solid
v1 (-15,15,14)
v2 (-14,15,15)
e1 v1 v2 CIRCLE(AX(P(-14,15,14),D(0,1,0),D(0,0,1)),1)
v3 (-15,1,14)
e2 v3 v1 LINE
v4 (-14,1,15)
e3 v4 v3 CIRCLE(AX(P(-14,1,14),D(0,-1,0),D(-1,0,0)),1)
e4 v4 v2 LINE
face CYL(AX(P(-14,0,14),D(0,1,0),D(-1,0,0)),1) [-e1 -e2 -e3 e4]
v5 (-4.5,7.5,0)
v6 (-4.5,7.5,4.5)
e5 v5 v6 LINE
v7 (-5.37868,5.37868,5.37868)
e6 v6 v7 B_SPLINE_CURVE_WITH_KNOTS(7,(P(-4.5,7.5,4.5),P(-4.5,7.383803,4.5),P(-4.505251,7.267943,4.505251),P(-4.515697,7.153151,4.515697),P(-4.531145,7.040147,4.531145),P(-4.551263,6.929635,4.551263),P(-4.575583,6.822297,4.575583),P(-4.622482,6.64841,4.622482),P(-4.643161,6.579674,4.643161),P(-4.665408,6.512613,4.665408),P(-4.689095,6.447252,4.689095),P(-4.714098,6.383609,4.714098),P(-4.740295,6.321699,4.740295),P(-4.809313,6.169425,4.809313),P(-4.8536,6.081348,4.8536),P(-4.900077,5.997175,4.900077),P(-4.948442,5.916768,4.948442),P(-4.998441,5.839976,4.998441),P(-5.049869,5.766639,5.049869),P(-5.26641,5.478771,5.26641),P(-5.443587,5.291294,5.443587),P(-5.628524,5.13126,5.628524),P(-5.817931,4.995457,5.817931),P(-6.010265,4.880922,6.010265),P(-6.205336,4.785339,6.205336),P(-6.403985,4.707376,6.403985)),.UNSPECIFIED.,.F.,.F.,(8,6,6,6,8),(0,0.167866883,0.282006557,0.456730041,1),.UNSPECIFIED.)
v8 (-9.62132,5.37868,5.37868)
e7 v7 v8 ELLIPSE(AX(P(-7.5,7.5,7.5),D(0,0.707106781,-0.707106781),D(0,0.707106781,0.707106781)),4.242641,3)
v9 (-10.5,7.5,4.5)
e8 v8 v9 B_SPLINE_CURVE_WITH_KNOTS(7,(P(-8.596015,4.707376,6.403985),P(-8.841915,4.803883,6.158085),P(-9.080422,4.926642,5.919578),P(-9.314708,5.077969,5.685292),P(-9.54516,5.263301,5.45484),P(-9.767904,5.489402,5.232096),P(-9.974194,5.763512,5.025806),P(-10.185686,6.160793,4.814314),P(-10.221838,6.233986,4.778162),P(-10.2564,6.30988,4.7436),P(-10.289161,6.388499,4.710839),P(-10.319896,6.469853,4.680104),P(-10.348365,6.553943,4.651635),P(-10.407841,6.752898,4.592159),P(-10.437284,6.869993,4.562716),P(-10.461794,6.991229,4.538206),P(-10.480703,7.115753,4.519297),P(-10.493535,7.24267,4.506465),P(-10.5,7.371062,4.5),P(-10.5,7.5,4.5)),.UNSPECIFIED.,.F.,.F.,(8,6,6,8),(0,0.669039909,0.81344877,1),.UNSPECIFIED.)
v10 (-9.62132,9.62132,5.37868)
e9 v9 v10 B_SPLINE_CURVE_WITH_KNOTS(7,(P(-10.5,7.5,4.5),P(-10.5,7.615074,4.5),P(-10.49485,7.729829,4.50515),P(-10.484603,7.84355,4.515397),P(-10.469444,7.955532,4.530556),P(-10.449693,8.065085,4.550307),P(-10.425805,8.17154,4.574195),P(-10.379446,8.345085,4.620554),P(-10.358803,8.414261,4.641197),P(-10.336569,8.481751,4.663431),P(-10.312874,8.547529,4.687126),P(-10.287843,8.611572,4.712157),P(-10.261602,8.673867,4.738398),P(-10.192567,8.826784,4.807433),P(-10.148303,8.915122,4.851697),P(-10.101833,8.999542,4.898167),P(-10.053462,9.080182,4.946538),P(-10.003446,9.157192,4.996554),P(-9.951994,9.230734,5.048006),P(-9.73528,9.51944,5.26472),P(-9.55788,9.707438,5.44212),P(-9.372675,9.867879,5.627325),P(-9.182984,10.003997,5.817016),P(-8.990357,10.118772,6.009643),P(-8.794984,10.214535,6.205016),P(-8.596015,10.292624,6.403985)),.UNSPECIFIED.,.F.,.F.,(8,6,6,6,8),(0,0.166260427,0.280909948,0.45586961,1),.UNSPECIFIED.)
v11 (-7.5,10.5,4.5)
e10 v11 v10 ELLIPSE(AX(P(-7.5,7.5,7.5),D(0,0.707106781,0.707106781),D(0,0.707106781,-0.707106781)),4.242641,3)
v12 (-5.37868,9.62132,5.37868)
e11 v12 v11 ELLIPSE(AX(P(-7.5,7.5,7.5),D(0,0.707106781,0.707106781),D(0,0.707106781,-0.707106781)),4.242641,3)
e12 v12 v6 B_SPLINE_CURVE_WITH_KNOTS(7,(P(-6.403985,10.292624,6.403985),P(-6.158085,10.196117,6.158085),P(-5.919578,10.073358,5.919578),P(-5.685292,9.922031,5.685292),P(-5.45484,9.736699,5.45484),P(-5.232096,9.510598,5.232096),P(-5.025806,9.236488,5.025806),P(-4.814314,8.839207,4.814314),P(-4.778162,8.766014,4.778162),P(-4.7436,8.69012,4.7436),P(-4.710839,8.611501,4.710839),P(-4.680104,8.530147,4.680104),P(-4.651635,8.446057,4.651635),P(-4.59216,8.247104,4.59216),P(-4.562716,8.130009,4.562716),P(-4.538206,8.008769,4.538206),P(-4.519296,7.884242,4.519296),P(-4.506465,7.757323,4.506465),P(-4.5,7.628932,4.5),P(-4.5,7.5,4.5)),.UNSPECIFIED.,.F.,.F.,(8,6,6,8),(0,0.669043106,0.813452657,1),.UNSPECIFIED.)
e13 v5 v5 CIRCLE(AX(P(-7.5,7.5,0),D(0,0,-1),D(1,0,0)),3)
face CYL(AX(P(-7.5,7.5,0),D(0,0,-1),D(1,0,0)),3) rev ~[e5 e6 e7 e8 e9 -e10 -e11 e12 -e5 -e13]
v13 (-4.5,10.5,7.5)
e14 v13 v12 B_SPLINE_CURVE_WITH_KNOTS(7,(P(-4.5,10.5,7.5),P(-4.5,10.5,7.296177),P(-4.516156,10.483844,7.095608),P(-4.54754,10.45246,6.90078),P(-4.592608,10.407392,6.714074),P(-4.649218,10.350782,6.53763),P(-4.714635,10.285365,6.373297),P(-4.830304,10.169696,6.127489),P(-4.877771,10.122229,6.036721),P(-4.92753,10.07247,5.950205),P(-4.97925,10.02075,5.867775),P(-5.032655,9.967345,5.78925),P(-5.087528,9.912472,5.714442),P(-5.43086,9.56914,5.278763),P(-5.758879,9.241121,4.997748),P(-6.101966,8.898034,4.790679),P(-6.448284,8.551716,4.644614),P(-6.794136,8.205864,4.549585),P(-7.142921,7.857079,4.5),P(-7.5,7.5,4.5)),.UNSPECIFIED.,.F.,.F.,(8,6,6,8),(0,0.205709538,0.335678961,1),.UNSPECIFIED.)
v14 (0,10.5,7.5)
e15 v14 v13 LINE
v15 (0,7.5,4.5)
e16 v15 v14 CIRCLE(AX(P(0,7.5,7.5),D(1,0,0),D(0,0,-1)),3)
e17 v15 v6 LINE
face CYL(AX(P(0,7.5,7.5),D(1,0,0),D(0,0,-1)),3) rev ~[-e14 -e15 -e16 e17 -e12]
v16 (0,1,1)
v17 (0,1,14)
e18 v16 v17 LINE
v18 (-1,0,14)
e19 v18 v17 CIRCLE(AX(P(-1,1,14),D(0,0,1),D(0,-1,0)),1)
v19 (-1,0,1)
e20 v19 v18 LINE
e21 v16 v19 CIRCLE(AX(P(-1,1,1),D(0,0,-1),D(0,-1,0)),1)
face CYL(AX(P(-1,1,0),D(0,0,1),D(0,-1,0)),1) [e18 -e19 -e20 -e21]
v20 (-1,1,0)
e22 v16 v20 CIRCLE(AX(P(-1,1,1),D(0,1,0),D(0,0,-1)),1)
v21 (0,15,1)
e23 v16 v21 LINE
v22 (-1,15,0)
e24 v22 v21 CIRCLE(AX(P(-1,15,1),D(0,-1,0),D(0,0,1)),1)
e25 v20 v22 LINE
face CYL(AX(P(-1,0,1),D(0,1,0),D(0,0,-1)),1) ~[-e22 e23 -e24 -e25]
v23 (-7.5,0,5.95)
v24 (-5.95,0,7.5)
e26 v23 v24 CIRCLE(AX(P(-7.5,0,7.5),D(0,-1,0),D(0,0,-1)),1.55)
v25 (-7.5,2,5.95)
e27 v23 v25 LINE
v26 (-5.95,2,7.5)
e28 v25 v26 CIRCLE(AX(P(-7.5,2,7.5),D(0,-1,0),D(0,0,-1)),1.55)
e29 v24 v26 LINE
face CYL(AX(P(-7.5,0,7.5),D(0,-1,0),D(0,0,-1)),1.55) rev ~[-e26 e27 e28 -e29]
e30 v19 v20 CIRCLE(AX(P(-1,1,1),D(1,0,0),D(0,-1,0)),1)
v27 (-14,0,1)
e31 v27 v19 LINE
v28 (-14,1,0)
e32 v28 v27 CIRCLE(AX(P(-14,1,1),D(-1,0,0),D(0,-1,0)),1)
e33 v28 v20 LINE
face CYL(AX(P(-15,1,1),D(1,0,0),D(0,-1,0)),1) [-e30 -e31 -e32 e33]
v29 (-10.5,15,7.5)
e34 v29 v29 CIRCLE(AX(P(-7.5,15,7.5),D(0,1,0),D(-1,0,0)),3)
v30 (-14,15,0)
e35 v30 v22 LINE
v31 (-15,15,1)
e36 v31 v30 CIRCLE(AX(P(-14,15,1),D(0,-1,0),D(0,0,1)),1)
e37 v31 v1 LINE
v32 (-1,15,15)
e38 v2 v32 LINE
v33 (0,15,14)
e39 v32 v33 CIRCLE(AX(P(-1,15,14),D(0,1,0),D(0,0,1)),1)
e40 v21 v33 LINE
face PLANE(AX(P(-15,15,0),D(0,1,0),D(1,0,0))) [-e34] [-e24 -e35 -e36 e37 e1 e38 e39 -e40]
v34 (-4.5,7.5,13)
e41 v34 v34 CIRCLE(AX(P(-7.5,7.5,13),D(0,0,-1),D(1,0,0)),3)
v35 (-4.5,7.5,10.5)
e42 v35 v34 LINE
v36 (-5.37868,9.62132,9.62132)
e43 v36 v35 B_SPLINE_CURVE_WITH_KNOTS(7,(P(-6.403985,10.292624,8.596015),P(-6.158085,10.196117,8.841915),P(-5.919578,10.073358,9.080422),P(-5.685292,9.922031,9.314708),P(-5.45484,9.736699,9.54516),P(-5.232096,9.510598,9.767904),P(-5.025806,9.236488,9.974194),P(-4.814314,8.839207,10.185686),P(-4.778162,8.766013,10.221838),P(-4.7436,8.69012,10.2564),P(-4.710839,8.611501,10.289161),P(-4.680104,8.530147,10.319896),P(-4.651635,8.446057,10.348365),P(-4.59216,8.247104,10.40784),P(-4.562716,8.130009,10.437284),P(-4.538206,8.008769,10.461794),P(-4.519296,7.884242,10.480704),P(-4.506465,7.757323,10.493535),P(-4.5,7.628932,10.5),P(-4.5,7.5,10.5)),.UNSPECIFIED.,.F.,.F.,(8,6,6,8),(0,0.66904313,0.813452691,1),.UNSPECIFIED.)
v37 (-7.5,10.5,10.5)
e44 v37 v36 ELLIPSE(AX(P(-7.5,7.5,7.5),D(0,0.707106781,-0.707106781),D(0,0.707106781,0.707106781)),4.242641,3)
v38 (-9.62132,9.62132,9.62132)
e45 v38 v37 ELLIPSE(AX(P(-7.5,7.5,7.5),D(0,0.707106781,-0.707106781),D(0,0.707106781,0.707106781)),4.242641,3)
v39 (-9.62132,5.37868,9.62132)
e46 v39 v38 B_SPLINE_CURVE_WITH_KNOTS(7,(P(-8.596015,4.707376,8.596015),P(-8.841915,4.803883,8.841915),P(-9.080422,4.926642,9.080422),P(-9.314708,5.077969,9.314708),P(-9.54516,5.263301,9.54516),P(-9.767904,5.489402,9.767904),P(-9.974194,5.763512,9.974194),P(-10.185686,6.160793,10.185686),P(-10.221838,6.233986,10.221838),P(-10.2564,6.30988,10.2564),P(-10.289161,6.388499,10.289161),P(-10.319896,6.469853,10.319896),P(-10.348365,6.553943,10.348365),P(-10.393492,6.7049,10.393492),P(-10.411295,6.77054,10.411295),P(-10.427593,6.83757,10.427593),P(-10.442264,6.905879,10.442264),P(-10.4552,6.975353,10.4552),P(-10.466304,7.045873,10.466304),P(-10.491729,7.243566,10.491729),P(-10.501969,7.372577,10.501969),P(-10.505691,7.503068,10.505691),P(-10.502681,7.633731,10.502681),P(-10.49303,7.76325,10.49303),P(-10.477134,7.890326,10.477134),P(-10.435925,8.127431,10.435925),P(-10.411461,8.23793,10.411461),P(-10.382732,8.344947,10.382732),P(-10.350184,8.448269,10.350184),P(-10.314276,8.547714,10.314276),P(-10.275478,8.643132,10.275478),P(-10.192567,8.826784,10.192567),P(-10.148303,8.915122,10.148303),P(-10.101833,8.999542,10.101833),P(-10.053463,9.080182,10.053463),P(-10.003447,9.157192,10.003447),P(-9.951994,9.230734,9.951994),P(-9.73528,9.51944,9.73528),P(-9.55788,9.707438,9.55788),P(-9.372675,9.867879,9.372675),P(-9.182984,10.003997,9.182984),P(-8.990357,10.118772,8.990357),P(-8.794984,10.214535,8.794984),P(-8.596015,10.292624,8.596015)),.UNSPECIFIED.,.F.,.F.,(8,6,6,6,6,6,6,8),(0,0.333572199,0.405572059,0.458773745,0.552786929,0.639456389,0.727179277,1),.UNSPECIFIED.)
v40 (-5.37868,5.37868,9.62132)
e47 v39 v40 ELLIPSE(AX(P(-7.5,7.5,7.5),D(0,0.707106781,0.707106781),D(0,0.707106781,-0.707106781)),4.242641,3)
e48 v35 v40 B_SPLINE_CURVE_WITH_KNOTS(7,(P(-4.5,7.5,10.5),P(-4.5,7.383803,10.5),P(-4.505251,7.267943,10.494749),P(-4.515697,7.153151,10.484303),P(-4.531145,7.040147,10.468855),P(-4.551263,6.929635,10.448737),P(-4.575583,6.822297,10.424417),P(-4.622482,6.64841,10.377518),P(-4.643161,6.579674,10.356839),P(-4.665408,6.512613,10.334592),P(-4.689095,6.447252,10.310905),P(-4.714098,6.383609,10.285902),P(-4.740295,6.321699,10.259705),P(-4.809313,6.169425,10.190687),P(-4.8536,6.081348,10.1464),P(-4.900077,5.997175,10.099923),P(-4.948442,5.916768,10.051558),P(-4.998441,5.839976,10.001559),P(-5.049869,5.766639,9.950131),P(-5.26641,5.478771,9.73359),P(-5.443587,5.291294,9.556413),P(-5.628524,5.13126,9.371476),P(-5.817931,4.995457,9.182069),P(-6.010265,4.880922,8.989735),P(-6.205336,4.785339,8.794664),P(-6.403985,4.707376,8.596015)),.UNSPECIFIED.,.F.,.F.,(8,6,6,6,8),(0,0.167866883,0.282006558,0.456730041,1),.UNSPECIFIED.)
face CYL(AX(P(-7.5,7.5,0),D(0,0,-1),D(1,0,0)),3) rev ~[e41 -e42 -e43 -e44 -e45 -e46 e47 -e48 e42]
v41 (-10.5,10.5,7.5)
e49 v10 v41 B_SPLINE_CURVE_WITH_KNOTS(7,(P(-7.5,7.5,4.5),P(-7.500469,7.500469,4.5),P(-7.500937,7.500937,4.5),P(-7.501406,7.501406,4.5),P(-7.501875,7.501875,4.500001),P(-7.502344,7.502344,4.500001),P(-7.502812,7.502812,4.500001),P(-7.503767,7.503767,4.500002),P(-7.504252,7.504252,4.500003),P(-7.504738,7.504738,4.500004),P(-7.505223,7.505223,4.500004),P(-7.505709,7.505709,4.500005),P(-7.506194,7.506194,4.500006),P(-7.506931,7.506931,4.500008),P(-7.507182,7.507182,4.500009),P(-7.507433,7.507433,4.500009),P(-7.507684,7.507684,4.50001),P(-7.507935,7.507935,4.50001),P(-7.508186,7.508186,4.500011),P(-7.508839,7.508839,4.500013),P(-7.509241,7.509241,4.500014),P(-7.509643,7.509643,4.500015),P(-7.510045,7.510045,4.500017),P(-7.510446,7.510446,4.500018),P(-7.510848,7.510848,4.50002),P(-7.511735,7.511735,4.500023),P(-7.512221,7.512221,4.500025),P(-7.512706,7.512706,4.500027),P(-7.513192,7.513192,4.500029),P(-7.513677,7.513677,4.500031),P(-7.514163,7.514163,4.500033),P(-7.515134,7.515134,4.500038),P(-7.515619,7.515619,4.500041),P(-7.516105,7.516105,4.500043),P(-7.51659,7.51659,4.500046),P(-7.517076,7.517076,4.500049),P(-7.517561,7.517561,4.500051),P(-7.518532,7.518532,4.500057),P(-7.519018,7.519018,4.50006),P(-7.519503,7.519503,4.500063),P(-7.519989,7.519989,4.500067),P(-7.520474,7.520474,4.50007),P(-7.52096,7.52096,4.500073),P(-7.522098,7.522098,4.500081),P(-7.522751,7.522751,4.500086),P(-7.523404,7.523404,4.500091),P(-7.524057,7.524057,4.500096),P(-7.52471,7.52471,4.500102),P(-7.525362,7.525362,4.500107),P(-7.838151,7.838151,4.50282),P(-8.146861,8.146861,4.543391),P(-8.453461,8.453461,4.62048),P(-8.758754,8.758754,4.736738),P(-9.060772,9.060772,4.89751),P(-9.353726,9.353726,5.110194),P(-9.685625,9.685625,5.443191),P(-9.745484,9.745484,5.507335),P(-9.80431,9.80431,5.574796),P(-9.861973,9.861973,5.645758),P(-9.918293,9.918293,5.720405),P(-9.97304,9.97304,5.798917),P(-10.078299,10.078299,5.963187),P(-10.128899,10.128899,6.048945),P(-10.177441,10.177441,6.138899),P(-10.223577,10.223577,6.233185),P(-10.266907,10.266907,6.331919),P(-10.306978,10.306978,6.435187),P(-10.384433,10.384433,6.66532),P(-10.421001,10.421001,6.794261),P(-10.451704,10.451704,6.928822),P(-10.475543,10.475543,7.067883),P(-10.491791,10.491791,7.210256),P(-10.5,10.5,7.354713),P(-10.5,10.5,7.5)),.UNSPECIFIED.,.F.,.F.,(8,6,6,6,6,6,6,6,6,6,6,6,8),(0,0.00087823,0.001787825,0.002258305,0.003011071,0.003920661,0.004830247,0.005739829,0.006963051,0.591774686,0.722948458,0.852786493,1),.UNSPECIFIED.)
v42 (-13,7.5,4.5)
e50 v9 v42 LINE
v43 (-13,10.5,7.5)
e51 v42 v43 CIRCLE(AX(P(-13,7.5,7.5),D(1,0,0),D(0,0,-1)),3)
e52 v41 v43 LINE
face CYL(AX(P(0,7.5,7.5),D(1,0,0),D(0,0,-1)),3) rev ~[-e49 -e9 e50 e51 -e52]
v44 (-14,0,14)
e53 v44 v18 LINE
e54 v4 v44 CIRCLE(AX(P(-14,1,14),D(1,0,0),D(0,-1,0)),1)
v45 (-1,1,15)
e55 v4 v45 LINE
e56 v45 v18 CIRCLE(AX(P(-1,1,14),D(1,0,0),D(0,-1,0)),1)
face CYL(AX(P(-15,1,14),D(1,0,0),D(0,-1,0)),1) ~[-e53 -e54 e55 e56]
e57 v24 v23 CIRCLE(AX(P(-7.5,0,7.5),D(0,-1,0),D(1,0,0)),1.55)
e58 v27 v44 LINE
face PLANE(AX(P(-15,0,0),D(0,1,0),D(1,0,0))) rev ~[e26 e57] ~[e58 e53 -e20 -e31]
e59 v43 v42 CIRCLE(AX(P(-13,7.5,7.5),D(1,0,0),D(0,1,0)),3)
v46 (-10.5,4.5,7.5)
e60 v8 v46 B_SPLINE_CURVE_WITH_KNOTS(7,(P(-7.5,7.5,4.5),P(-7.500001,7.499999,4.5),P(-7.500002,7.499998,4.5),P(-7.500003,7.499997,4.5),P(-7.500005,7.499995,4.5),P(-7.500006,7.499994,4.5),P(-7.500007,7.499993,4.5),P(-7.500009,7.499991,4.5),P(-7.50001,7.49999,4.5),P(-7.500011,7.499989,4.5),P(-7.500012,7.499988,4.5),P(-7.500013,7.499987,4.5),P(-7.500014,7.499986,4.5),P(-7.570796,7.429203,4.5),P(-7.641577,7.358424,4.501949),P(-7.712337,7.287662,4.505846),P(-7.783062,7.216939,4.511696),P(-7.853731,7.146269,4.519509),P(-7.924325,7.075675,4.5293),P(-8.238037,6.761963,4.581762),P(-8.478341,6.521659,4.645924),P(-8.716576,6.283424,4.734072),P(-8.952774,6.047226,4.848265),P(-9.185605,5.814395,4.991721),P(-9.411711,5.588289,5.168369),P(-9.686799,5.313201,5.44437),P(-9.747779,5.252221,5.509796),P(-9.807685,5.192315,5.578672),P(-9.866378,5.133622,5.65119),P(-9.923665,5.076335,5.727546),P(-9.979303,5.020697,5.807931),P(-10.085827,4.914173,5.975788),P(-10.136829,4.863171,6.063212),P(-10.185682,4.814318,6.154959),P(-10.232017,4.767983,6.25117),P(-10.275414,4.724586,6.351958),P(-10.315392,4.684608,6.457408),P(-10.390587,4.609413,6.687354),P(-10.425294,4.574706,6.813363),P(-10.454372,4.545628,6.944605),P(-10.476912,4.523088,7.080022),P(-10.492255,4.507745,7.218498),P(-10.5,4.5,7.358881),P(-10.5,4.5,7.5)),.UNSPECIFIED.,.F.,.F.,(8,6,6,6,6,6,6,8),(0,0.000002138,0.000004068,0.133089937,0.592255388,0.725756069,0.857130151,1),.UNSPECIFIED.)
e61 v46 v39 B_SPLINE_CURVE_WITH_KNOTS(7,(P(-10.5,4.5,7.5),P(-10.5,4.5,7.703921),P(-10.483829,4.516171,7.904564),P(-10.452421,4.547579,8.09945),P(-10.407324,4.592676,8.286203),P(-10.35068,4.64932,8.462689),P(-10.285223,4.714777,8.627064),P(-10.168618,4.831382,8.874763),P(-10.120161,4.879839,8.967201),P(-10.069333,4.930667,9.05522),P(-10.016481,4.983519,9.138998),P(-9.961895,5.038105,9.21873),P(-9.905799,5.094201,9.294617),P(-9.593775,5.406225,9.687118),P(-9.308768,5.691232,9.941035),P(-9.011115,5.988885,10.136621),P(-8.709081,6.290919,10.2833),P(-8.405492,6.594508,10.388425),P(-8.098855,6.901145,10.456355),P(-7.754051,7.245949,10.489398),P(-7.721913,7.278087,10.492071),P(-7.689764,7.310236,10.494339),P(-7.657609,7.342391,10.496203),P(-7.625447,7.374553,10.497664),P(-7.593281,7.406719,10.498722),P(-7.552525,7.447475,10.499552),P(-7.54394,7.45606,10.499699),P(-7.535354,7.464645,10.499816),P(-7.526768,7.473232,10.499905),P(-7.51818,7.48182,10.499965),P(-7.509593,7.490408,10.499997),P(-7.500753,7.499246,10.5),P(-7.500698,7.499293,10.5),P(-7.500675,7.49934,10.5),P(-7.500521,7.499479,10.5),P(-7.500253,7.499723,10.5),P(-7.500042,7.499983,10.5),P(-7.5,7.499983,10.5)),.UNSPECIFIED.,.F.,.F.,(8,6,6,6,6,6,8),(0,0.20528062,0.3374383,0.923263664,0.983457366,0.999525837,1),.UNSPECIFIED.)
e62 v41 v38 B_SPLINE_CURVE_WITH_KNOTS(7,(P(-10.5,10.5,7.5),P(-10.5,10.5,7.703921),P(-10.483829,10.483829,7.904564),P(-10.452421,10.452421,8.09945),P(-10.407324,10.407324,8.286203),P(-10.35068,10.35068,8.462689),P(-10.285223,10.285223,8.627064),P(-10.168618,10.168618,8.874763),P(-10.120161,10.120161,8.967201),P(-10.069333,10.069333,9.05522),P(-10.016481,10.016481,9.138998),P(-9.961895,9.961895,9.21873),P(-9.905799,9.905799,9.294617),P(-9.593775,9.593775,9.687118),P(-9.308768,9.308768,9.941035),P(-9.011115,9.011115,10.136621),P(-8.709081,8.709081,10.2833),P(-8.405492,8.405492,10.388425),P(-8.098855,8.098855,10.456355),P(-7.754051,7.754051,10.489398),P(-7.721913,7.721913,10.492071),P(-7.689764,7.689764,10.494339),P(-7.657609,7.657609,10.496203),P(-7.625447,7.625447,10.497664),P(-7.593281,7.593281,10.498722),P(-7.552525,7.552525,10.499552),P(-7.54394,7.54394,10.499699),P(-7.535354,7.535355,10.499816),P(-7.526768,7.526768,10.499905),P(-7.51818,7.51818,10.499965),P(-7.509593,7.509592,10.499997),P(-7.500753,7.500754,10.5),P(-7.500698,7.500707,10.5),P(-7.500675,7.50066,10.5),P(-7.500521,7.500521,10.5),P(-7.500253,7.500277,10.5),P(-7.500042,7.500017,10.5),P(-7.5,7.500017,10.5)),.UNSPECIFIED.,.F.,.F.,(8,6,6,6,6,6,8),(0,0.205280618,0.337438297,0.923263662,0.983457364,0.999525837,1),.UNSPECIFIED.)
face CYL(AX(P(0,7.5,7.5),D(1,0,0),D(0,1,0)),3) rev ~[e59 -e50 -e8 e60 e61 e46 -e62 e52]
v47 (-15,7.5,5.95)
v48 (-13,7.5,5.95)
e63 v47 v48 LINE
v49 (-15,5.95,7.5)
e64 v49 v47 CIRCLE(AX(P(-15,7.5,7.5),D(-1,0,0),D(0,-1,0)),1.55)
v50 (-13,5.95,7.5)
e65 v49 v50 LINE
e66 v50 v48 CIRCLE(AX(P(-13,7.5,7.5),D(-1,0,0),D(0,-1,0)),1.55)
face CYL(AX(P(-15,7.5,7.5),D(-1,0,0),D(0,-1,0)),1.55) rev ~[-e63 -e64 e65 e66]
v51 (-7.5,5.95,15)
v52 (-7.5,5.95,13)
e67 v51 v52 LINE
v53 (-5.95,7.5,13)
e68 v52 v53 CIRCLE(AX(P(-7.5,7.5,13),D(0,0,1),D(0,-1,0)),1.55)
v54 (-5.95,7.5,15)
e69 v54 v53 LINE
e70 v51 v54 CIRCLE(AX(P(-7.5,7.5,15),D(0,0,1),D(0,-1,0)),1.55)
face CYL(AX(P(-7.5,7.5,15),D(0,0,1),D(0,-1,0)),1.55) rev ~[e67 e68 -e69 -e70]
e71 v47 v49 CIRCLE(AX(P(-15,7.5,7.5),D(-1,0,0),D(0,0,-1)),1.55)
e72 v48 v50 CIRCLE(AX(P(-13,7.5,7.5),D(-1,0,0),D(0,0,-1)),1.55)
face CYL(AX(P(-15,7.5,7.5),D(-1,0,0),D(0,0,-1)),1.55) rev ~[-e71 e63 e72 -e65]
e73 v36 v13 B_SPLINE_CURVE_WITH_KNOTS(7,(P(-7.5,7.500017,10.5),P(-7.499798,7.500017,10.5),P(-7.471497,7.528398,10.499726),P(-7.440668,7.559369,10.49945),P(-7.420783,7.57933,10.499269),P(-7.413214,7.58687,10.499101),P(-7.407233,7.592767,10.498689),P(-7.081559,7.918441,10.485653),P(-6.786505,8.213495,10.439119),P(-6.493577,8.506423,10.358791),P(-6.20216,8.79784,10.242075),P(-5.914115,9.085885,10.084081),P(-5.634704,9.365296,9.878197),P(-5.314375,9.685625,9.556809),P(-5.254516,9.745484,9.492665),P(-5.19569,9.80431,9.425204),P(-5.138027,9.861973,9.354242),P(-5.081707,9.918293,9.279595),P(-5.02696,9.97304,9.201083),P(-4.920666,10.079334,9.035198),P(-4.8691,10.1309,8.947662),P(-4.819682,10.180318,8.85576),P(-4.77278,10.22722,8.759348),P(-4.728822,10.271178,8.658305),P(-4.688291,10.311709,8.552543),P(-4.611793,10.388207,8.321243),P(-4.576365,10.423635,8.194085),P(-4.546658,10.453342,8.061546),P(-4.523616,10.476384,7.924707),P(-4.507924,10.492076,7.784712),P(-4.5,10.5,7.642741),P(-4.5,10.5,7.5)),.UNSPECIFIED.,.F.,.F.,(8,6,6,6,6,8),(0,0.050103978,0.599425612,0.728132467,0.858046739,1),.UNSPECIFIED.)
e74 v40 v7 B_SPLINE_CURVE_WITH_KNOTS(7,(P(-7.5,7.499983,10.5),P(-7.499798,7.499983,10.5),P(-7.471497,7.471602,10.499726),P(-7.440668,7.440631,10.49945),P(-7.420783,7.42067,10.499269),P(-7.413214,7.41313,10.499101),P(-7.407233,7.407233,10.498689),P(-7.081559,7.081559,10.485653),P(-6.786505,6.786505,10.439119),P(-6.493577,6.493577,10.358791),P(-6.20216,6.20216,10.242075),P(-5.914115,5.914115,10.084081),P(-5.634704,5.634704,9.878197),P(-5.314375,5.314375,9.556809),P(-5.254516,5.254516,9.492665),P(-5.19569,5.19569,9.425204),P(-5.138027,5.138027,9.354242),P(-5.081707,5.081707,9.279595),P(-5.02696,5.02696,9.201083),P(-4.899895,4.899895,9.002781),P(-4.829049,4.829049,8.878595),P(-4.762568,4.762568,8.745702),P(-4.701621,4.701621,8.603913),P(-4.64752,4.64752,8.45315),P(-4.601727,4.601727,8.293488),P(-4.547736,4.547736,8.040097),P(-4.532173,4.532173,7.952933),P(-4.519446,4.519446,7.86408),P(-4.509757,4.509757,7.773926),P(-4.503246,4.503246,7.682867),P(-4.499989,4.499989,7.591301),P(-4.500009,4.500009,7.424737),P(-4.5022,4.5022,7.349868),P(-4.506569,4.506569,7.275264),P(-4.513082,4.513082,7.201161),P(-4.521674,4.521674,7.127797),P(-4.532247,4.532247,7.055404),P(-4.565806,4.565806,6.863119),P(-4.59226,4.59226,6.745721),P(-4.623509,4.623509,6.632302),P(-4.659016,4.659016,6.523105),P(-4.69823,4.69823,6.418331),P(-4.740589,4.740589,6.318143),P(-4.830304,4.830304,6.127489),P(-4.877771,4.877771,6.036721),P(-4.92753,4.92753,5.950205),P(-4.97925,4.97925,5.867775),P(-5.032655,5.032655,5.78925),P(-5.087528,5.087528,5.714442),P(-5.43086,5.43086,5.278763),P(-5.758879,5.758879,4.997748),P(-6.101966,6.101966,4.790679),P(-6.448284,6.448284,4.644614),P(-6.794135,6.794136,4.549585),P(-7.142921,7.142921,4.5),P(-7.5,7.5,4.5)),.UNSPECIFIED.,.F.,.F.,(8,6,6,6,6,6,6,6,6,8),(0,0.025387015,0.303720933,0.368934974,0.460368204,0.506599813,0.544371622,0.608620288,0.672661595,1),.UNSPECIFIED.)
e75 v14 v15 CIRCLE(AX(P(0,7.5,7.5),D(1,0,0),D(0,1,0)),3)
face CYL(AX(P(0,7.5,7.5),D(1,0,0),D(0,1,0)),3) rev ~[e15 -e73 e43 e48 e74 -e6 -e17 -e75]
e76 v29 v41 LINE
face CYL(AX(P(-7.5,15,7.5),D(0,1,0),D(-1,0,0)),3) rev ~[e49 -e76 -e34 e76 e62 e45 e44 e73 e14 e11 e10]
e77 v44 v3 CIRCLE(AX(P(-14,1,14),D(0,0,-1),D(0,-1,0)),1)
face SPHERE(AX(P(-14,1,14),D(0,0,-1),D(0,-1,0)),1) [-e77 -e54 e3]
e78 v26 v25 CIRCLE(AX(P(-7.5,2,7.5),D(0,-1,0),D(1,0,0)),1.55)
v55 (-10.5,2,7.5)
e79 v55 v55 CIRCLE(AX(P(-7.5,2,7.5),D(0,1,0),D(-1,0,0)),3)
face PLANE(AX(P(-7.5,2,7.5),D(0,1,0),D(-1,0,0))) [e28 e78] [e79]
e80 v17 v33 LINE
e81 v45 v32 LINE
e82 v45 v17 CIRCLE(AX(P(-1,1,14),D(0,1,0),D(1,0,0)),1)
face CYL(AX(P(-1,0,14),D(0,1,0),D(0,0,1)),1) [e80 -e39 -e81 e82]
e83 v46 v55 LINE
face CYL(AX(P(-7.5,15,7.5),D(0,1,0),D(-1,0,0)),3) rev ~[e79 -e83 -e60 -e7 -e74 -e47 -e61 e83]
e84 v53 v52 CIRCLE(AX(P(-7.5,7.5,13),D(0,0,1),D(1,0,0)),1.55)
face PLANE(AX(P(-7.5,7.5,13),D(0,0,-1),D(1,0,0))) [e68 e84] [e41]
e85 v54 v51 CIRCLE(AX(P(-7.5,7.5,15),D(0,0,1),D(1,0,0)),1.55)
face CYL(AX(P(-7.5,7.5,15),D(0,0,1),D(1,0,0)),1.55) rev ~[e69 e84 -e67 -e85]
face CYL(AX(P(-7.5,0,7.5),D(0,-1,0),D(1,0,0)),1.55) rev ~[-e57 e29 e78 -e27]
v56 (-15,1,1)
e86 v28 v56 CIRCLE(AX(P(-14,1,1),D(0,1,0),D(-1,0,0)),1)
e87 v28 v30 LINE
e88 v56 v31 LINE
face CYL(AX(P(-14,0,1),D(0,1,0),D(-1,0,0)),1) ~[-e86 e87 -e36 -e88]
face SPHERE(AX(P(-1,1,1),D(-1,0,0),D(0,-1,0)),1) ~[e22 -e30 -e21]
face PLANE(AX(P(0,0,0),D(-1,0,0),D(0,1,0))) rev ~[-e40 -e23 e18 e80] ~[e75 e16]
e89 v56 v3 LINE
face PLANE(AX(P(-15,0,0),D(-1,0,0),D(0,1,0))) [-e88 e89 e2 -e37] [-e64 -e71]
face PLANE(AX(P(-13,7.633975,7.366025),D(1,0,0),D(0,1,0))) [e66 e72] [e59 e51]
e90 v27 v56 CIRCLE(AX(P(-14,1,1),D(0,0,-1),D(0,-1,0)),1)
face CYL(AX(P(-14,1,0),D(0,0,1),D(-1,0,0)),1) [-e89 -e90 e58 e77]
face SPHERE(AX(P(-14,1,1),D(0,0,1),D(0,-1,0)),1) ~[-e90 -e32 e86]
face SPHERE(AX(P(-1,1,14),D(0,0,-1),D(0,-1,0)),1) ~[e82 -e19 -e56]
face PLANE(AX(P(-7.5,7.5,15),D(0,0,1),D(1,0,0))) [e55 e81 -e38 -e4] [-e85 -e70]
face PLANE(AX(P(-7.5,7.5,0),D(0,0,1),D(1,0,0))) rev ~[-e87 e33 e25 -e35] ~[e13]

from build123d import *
from build123d import SkipClean  # not in build123d's __all__

# Parameters (mm, degrees)
F0_W      = 15
F0_H      = 15
F1_DEPTH  = 15
F3_DEPTH  = 25
F5_DEPTH  = 25
F7_DEPTH  = 13
F9_DEPTH  = 25
F10_R     = 3
F11_DEPTH = 13
F12_R     = 3
F13_DEPTH = 13
F14_R     = 1


with BuildPart() as f1:
    # F0 (on Top) → F1 (new body)
    with BuildSketch(Plane.XY):
        with Locations((-7.5, 7.5)):
            Rectangle(F0_W, F0_H)
    extrude(amount=F1_DEPTH)

    # F2 (on face) → F3 (cut)
    with BuildSketch(Plane.XZ):
        with BuildLine():
            ThreePointArc((-7.5, 5.95), (-6.4039844892, 6.4039844892), (-5.95, 7.5))
            ThreePointArc((-5.95, 7.5), (-8.5960155108, 8.5960155108), (-7.5, 5.95))
        make_face()
    extrude(amount=-F3_DEPTH, mode=Mode.SUBTRACT)

    # F4 (on face) → F5 (cut)
    with BuildSketch(Plane.XY.offset(15)):
        with BuildLine():
            ThreePointArc((-7.5, 5.95), (-6.4039844892, 6.4039844892), (-5.95, 7.5))
            ThreePointArc((-5.95, 7.5), (-8.5960155108, 8.5960155108), (-7.5, 5.95))
        make_face()
    extrude(amount=-F5_DEPTH, mode=Mode.SUBTRACT)

    # F6 (on face) → F7 (cut)
    with BuildSketch(Plane.YZ):
        with BuildLine():
            ThreePointArc((7.5, 4.5), (9.6213203436, 5.3786796564), (10.5, 7.5))
            ThreePointArc((10.5, 7.5), (5.3786796564, 9.6213203436), (7.5, 4.5))
        make_face()
    with SkipClean():  # cleaning this boolean's faces spoils the solid; the shape is the same uncleaned
        extrude(amount=-F7_DEPTH, mode=Mode.SUBTRACT)

    # F8 (on face) → F9 (cut)
    with BuildSketch(Plane(origin=(-15, 0, 0), x_dir=(0, -1, 0), z_dir=(-1, 0, 0))):
        with BuildLine():
            ThreePointArc((-7.5, 5.95), (-6.4039844892, 6.4039844892), (-5.95, 7.5))
            ThreePointArc((-5.95, 7.5), (-8.5960155108, 8.5960155108), (-7.5, 5.95))
        make_face()
    with SkipClean():  # cleaning this boolean's faces spoils the solid; the shape is the same uncleaned
        extrude(amount=-F9_DEPTH, mode=Mode.SUBTRACT)

    # F10 (on face) → F11 (cut)
    with BuildSketch(Plane(origin=(0, 15, 0), x_dir=(-1, 0, 0), z_dir=(0, 1, 0))):
        with Locations((7.5, 7.5)):
            Circle(F10_R)
    extrude(amount=-F11_DEPTH, mode=Mode.SUBTRACT)

    # F12 (on face) → F13 (cut)
    with BuildSketch(Plane(origin=(0, 0, 0), x_dir=(1, 0, 0), z_dir=(0, 0, -1))):
        with Locations((-7.5, -7.5)):
            Circle(F12_R)
    extrude(amount=-F13_DEPTH, mode=Mode.SUBTRACT)

    # F14
    f14_edges = [f1.edges().sort_by_distance(p)[0] for p in [
        (-15, 0, 7.5),
        (-7.5, 0, 0),
        (0, 0, 7.5),
        (-7.5, 0, 15),
        (-15, 7.5, 0),
        (-15, 7.5, 15),
        (0, 7.5, 15),
        (0, 7.5, 0),
    ]]
    fillet(f14_edges, radius=F14_R)


solid = f1.part
